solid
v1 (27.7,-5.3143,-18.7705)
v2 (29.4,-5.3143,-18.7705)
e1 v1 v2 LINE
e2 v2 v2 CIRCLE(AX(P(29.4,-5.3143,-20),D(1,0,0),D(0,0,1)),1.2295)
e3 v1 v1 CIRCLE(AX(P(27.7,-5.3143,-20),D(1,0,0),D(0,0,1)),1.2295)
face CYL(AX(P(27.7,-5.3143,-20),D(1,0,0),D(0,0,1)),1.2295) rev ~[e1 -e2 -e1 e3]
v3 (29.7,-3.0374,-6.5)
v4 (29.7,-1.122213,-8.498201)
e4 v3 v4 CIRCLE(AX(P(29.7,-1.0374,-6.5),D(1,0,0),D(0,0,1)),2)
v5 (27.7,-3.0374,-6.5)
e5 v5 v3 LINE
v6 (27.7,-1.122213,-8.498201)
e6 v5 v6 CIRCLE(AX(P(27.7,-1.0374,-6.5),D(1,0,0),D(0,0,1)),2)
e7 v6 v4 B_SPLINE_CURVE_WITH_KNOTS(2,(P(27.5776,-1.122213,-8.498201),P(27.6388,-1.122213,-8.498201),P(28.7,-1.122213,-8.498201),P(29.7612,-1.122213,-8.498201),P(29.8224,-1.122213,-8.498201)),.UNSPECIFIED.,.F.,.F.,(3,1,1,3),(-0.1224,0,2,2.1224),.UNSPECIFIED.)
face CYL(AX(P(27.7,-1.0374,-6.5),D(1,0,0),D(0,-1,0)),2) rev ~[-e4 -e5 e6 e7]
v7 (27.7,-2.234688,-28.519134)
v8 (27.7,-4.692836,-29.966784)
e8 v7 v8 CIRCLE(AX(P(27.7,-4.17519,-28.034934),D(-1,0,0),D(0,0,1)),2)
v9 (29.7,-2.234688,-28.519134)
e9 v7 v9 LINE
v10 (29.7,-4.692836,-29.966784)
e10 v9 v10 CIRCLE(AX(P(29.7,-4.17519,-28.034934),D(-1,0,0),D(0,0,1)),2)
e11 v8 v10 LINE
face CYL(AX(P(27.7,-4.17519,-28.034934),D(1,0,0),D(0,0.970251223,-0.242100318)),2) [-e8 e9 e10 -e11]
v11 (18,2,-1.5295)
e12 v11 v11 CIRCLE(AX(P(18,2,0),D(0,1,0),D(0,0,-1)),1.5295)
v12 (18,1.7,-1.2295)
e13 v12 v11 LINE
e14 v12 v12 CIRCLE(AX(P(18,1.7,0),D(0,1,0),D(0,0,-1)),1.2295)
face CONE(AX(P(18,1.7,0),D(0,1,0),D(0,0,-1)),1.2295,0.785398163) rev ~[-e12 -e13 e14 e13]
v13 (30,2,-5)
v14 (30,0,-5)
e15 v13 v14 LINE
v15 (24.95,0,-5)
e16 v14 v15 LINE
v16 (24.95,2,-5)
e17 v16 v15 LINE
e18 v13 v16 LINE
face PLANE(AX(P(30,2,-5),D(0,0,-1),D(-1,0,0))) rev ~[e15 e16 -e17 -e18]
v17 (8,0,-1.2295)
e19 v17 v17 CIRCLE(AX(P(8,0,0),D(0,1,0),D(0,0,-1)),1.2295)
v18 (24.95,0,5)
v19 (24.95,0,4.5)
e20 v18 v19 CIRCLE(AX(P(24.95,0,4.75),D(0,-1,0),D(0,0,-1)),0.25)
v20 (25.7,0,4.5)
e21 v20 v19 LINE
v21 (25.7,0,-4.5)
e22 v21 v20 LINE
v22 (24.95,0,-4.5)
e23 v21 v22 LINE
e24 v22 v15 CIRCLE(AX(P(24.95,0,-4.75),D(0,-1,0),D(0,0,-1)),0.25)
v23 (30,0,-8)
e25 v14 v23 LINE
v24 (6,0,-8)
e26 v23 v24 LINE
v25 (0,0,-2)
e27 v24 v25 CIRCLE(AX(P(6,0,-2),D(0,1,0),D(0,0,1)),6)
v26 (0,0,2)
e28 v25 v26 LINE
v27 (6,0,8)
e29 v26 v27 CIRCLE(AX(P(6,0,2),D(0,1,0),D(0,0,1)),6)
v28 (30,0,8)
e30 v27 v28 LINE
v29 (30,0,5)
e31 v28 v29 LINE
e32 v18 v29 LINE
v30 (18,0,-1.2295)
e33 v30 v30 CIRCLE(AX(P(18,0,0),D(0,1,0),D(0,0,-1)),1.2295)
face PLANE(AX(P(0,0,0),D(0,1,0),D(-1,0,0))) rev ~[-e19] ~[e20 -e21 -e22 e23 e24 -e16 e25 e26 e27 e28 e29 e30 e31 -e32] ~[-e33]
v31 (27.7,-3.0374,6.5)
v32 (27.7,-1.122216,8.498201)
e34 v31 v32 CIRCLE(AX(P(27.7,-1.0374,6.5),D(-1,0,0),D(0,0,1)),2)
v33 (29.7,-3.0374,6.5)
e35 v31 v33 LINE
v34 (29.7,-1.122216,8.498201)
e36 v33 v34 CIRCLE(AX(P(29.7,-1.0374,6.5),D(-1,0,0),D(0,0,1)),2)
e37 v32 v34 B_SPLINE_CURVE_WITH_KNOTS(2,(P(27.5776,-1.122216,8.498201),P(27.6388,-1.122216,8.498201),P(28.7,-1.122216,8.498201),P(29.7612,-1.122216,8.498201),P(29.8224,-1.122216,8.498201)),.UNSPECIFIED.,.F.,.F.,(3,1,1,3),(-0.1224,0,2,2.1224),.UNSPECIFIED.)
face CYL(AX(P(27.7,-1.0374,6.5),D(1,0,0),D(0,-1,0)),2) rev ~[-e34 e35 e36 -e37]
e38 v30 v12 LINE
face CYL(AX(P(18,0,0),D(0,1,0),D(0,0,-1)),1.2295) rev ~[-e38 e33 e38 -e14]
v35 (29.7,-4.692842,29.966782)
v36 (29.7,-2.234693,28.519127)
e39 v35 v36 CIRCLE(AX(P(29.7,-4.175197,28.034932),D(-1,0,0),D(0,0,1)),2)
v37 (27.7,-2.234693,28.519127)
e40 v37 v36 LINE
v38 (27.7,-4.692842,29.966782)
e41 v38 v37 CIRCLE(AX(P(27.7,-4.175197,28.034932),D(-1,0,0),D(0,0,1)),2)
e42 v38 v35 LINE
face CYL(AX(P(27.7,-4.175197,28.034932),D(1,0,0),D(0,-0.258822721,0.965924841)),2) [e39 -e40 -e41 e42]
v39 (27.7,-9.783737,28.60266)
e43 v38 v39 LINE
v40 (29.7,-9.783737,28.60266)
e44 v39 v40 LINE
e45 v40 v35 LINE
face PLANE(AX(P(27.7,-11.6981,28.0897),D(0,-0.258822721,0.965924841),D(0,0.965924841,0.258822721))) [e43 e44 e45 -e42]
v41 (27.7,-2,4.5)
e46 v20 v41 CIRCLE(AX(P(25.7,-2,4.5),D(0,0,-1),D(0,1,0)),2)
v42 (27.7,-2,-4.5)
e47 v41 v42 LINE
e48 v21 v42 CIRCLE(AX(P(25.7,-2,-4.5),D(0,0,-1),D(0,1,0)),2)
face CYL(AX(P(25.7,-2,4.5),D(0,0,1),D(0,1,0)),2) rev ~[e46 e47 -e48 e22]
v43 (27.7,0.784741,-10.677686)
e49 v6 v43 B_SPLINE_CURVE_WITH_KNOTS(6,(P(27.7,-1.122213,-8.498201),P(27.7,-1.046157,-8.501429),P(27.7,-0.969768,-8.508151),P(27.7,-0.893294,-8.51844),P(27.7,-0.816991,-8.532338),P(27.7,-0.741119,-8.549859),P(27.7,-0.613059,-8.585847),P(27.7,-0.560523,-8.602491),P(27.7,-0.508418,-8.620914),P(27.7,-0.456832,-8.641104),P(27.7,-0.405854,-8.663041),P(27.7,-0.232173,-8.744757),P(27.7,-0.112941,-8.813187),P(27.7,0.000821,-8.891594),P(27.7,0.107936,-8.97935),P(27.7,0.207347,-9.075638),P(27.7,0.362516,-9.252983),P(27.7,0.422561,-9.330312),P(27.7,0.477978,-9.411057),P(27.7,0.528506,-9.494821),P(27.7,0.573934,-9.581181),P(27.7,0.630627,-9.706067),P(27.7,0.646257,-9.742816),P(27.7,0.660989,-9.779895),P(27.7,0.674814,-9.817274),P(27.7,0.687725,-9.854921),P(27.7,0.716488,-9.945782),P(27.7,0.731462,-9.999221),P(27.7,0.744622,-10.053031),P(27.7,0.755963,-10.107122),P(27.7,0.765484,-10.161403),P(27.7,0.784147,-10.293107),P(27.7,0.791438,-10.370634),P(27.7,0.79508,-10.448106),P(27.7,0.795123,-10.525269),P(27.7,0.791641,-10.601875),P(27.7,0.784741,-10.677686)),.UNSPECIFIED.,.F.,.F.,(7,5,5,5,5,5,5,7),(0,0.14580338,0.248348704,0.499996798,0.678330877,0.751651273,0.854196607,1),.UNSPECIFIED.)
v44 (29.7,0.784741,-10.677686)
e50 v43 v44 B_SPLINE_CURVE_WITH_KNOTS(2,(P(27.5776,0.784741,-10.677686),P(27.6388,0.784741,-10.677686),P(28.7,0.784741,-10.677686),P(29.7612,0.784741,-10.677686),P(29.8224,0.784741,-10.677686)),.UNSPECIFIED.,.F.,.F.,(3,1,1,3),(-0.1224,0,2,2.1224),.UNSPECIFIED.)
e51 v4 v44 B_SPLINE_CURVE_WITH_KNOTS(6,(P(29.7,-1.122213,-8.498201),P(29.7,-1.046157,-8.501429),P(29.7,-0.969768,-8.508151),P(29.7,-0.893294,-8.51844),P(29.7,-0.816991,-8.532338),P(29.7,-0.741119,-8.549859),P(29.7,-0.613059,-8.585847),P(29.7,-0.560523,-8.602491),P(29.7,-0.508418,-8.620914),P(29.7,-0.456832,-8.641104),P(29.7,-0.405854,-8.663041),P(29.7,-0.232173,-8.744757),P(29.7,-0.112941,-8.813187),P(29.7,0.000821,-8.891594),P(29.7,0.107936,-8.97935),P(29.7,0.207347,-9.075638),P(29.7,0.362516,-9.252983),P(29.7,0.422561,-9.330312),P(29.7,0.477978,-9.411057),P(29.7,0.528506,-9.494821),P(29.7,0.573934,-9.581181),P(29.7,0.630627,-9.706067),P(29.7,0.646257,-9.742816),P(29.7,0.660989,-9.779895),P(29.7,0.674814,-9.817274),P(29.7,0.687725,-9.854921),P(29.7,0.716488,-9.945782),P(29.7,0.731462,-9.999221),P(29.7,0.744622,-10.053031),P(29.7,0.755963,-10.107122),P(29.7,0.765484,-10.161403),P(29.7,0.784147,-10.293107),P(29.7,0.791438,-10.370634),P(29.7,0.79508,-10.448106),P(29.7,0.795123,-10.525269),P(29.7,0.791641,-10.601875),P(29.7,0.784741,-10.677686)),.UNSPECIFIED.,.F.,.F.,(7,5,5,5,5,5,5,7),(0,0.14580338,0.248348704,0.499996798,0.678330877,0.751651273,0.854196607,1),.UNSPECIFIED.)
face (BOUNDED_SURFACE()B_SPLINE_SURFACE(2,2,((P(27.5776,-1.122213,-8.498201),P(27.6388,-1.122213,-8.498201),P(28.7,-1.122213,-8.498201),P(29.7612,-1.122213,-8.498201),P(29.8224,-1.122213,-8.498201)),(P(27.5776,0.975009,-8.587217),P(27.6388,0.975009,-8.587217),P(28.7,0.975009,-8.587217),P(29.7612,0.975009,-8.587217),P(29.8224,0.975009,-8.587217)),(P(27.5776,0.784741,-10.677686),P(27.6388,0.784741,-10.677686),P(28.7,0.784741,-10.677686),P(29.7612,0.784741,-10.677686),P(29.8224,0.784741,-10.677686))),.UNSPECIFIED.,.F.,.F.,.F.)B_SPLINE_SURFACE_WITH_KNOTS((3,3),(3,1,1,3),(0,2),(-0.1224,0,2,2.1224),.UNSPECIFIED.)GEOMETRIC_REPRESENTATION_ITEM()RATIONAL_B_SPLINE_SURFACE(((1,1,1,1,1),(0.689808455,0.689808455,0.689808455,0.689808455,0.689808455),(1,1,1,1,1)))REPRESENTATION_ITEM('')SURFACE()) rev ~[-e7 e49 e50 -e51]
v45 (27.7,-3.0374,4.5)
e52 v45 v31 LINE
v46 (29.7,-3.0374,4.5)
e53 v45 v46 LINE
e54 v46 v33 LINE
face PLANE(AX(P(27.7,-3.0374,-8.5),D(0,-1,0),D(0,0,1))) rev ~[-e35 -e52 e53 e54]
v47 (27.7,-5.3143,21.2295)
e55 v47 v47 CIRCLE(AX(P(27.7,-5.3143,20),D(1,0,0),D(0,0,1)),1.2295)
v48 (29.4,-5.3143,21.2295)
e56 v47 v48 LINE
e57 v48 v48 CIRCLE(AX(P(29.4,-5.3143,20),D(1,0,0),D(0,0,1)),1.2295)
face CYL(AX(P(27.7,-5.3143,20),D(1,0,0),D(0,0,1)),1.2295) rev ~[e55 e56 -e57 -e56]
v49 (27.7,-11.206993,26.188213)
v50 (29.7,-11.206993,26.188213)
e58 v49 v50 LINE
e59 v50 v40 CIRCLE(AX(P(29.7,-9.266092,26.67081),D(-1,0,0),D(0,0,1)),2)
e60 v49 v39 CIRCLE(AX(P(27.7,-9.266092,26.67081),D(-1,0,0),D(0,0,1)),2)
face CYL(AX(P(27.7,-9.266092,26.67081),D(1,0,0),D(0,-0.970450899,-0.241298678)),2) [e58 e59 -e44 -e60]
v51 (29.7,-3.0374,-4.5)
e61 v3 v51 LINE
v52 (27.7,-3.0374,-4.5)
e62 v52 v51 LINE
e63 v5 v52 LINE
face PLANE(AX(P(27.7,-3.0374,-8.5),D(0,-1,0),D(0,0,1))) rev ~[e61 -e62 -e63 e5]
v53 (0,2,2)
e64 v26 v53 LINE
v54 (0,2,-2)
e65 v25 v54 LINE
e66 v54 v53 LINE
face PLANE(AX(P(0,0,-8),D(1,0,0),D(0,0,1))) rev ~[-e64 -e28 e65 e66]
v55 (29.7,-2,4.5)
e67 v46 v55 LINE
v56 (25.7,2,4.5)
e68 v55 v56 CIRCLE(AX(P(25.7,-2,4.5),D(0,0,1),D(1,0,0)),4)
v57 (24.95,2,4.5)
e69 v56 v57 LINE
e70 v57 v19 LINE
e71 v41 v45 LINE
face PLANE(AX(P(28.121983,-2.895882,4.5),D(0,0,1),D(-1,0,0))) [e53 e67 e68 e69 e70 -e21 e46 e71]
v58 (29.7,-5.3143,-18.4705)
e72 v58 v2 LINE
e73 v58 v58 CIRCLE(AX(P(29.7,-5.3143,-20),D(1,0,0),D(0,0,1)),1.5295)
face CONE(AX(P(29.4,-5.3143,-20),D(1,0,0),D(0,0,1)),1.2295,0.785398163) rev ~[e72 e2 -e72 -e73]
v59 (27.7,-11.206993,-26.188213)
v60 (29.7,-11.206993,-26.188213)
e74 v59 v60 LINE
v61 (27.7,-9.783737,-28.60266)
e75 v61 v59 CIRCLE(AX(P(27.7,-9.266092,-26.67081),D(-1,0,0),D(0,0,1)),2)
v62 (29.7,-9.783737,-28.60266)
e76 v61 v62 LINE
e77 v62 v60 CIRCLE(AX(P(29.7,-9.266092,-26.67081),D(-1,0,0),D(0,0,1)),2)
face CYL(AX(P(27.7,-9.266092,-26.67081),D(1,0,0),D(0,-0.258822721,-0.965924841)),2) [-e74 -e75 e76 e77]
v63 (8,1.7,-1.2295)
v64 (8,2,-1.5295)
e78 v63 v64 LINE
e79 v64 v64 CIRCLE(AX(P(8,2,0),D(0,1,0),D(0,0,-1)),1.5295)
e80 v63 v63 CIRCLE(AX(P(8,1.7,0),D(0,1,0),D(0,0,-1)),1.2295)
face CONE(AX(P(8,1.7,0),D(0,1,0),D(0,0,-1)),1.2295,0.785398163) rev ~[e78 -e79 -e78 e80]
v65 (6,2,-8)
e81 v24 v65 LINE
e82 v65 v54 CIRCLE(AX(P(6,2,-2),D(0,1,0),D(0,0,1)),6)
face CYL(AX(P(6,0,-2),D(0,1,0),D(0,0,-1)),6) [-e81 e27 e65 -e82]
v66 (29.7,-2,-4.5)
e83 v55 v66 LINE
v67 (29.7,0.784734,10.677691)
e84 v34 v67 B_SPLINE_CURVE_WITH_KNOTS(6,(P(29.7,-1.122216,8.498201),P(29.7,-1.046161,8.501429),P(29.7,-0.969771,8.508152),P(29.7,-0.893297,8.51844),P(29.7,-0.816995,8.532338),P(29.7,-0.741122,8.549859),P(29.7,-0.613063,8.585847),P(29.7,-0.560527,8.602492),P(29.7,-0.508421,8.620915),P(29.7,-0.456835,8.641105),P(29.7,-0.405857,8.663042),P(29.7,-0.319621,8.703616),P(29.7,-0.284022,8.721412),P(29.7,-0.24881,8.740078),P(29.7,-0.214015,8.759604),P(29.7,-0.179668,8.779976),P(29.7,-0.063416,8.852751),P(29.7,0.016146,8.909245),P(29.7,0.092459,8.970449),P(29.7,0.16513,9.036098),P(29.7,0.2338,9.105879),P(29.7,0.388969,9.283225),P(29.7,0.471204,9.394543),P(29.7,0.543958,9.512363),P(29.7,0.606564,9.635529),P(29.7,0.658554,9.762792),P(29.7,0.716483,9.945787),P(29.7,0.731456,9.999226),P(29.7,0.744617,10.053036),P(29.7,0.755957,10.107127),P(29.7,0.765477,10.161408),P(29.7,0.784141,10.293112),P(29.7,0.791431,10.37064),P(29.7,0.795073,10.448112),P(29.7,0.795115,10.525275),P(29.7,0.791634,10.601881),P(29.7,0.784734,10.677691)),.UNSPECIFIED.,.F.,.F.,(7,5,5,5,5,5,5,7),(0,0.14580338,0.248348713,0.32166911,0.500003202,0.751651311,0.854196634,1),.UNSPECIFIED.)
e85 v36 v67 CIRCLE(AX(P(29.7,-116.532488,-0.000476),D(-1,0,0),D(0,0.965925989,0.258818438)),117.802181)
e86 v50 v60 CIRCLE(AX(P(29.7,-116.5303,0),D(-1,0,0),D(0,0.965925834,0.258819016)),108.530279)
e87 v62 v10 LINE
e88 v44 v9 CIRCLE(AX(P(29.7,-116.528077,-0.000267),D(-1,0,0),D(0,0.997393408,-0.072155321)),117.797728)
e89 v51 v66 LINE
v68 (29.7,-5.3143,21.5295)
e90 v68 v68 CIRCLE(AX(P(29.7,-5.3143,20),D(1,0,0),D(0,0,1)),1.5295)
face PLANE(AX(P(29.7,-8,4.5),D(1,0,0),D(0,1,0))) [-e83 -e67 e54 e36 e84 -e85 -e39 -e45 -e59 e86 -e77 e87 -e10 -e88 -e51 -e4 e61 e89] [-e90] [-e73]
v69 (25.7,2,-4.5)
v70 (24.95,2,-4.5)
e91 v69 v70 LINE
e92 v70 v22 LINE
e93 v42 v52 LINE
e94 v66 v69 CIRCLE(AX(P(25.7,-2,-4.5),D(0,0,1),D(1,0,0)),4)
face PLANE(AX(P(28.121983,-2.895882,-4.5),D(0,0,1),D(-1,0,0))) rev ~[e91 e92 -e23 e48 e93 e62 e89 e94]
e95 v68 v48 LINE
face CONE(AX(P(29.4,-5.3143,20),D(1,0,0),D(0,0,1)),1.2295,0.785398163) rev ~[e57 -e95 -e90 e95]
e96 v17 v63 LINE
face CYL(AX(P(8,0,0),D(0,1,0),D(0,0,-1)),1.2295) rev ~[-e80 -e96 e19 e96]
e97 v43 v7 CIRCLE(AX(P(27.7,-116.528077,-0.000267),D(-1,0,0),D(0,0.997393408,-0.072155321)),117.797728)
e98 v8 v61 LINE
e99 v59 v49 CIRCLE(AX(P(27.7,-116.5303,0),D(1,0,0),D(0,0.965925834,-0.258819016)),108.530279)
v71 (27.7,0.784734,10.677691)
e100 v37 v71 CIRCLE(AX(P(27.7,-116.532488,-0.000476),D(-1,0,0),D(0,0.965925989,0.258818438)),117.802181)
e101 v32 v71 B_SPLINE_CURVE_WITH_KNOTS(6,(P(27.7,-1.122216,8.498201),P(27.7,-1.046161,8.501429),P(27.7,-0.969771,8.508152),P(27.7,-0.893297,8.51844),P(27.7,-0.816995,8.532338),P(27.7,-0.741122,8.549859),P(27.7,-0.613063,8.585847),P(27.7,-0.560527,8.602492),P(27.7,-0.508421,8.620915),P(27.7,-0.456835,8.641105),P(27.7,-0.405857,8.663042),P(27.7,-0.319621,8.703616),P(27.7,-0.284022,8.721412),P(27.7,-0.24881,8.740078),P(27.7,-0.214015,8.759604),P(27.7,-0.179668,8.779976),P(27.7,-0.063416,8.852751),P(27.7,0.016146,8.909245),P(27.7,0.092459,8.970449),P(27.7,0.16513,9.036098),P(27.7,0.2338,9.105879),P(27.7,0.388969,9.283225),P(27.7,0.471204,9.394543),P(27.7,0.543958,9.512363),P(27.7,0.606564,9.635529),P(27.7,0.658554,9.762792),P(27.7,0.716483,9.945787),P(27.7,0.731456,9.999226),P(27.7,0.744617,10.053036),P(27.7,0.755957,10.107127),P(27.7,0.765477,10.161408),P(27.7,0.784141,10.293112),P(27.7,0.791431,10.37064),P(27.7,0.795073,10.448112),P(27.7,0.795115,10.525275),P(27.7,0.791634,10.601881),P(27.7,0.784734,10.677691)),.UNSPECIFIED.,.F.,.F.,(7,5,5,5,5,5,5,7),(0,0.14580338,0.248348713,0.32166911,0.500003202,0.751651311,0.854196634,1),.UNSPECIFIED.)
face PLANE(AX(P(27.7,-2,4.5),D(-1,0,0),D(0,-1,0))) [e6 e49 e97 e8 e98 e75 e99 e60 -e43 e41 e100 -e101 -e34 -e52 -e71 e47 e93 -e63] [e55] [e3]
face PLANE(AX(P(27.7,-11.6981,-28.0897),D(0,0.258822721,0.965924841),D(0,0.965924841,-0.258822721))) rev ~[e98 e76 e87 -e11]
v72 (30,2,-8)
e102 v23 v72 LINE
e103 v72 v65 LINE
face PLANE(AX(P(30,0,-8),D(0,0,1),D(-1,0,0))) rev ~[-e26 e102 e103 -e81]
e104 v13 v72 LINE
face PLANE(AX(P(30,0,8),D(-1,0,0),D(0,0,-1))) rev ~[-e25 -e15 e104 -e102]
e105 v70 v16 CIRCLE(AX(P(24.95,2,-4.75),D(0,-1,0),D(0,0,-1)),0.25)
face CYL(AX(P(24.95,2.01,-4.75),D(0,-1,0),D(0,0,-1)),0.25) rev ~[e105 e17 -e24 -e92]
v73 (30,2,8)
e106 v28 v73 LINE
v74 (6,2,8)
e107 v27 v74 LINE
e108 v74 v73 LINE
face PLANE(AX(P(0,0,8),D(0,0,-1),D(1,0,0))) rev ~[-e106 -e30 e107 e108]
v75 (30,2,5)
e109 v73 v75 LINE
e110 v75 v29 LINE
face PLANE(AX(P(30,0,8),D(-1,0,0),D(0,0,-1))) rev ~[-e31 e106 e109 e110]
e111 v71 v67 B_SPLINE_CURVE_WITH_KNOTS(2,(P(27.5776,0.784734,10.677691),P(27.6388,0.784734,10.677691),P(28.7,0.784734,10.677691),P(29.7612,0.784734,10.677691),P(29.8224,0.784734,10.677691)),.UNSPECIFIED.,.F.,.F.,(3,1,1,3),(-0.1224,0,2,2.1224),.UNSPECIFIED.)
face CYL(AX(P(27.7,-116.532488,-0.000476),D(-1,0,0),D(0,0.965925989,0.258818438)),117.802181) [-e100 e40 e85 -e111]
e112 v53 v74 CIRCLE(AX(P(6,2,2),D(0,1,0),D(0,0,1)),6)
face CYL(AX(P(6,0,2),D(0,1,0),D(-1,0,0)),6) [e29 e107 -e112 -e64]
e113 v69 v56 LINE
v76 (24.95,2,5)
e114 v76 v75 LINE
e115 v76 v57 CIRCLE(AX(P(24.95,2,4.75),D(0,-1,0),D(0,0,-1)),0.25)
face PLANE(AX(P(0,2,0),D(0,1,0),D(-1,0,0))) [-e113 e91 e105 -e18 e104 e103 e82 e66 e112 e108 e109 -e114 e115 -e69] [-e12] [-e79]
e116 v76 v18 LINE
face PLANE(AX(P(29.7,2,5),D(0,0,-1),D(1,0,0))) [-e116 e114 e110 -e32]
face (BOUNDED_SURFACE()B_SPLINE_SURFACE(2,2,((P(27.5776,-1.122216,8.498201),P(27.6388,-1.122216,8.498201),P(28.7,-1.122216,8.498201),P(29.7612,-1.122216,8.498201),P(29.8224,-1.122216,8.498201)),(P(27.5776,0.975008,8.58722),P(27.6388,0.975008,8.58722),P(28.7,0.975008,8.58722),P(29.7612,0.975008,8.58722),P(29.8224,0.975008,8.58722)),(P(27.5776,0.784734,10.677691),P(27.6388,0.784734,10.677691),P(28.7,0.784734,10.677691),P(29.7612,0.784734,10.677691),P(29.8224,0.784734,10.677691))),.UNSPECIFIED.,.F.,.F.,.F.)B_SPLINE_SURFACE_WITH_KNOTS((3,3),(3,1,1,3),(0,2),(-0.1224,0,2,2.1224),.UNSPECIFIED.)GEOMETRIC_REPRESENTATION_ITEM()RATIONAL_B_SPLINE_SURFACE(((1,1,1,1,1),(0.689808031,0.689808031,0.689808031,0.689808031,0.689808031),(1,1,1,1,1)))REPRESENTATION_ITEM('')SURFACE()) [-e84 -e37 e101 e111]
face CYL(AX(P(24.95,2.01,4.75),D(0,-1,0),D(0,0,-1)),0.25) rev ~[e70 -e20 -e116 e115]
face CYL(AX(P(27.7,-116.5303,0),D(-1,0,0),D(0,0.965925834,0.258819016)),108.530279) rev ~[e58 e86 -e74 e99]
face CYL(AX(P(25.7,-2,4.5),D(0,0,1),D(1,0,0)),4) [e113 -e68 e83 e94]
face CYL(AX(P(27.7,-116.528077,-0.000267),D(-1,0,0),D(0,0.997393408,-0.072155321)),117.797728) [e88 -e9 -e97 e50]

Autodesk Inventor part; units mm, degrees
ref_plane "YZ Plane" through (0, 0, 0) normal (1, 0, 0) x (0, 1, 0)
ref_plane "XZ Plane" through (0, 0, 0) normal (0, 1, 0) x (-1, 0, 0)
ref_plane "XY Plane" through (0, 0, 0) normal (0, 0, 1) x (1, 0, 0)
sketch "Szkic1" plane through (0, 0, 0) normal (0, 1, 0) x (-1, 0, 0)
  line L0 (0, 8) -> (-30, 8)
  line L1 (-30, 8) -> (-30, -8)
  line L2 (-30, -8) -> (0, -8)
  line L3 (0, -8) -> (0, 8)
  point P0 (0, 0)
  dimension "d0" = 30
  dimension "d1" = 16
  dimension "d18" = 8
extrude "Płyta1" add sketch "Szkic1" along normal blind 2
sketch "Szkic2" plane through (0, 2, 0) normal (0, 1, 0) x (1, 0, 0)
  line L0 (30, -8) -> (30, 8) projected
  line L1 (30, 5) -> (29.7, 5)
  line L2 (29.7, 5) -> (29.7, -5)
  line L3 (29.7, -5) -> (30, -5)
  line L4 (30, -5) -> (30, 5)
  line L5 (0, 8) -> (30, 8) projected
  point P0 (0, 0)
  dimension "d3" = 10
  dimension "d4" = 3
  dimension "d5" = 0.3
extrude "Wyciągnięcie proste1" cut sketch "Szkic2" against normal up to next
sketch "Szkic3" plane through (27.7, 2, -5) normal (1, 0, 0) x (0, -1, 0)
  line L0 (0, 9.5) -> (0, 0.5)
  line L1 (0, 0.5) -> (10, 0.5)
  line L2 (10, 0.5) -> (10, 9.5)
  line L3 (10, 9.5) -> (0, 9.5)
edge flange "Kołnierz1" height 10 angle 90 thickness 2 bend radius 2 thickness toward (1, 0, 0) relief round relief width 0.5 relief depth 1 edges at (29.7, 2, 0) wall of the first edge with corners at (27.7, 2, 4.5) (27.7, 2, -4.5) (27.7, -8, -4.5) (27.7, -8, 4.5)
bend "Zagięcie1"
corner "Narożnik1"
sketch "Szkic5" plane through (27.7, -8, -4.5) normal (-1, 0, 0) x (0, 0, 1)
  line L0 (9, 0) -> (0, 0)
  arc A0 (32.5897, -3.6981) -> (-23.5897, -3.6981) centre (4.5, -108.5303) ccw
  line L1 (9.5, 10) -> (12.5, 10)
  line L2 (32.5897, -3.6981) -> (34.9889, 5.2557)
  line L3 (-23.5897, -3.6981) -> (-25.9889, 5.2557)
  line L4 (0, 6) -> (9, 6)
  arc A1 (34.9889, 5.2557) -> (13, 8.9626) centre (4.5, -108.5303) ccw
  arc A2 (-4, 8.9626) -> (-25.9889, 5.2557) centre (4.5, -108.5303) ccw
  line L5 (-4, 8.9626) -> (-4, 4.9626)
  line L6 (-4, 4.9626) -> (13, 4.9626)
  line L7 (13, 4.9626) -> (13, 8.9626)
  circle A3 centre (4.5, -108.5303) radius 113
  line L8 (4.5, 0) -> (4.5, -108.5303)
  point P0 (4.5, 8)
  dimension "d38" = 4
  dimension "d39" = 17
  dimension "d42" = 226
  dimension "d69" = 108.5303
sheet face with bend "Powierzchnia2" sketch "Szkic5" thickness 2 toward (1, 0, 0) bend radius 2 picked at (25.4474, 0.8245) contours A0 L3 A3 L2 | A3 L3 A2 L5 L6 L7 A1 L2
bend "Zagięcie2"
fillet "Zaokrąglenie narożnika1" radius 2 8 edges at (28.7, 0.9626, -8.5) (28.7, -11.6981, -28.0897) (28.7, -11.6981, 28.0897) (28.7, -3.0374, -8.5) (28.7, -2.7443, 30.4889) (28.7, 0.9626, 8.5) (28.7, -3.0374, 8.5) (28.7, -2.7443, -30.4889)
fillet "Zaokrąglenie narożnika2" radius 6 2 edges at (0, 1, 8) (0, 1, -8)
sketch "Szkic6" plane through (27.7, -2, -4.5) normal (-1, 0, 0) x (0, 0, 1)
  point P0 (4.5, 2)
sketch "Szkic7" plane through (27.7, -2, -4.5) normal (-1, 0, 0) x (0, 0, 1)
  line L0 (9, 0) -> (0, 0) projected
  line L1 (4.5, 0) -> (4.5, -9.6943)
  arc A0 (30.6882, -9.207) -> (-21.6882, -9.207) centre (4.5, -114.5303) ccw projected
  line L2 (4.5, -6) -> (4.5, -114.5303)
  circle A1 centre (4.5, -114.5303) radius 113
  point P0 (4.5, 2)
  point P1 (24.5, -3.3143)
  point P2 (-15.5, -3.3143)
  dimension "d49" = 20
  dimension "d50" = 20
  dimension "d70" = 108.5303
  dimension "d71" = 226
hole "Otwór1" at (27.7, -5.3143, -20) at (27.7, -5.3143, 20) direction (1, 0, 0) diameter 2.459 end through all thread size "M3x0.5" class "6H" standard "ANSI Metric M Profile"
sketch "Szkic8" plane through (0, 0, 0) normal (0, -1, 0) x (1, 0, 0)
  line L0 (30, 5) -> (30, 8) projected
  point P0 (0, 0)
  point P1 (8, 0)
  point P2 (18, 0)
  dimension "d60" = 8
  dimension "d61" = 10
  dimension "d75" = 12
hole "Otwór2" at (8, 0, 0) at (18, 0, 0) direction (0, 1, 0) diameter 2.459 end through all thread size "M3x0.5" class "6H" standard "ANSI Metric M Profile"
chamfer "Faza1" distance 0.3 angle 45 4 edges at (29.7, -5.3143, -21.2295) (29.7, -5.3143, 18.7705) (8, 2, 1.2295) (18, 2, 1.2295)
equation "\"d2\" = Grubość"
equation "\"d9\" = GłębokośćGięciaPodcięcia"
equation "\"d10\" = MinimalnaPozostałość"
equation "\"d11\" = PromieńPrzejścia"
equation "\"d14\" = PromieńGięcia"
equation "\"d15\" = RozmiarPodcięciaNarożnika"
equation "\"d16\" = Wielk_odstępu"
equation "\"d17\" = Rozmiar_promienia_Jacobiego"
equation "\"d31\" = PromieńGięcia"
equation "\"d32\" = SzerokośćGięciaPodcięcia"
equation "\"d34\" = MinimalnaPozostałość"
equation "\"d33\" = GłębokośćGięciaPodcięcia"
equation "\"d35\" = PromieńPrzejścia"
equation "\"PromieńGięcia\" = Grubość"
equation "\"SzerokośćGięciaPodcięcia\" = Grubość"
equation "\"GłębokośćGięciaPodcięcia\" = 0.5 * Grubość"
equation "\"RozmiarPodcięciaNarożnika\" = 4 * Grubość"
equation "\"MinimalnaPozostałość\" = 2 * Grubość"
equation "\"PromieńPrzejścia\" = PromieńGięcia"
equation "\"Rozmiar_promienia_Jacobiego\" = PromieńGięcia"
equation "\"Wielk_odstępu\" = Grubość"
equation "\"Grubość\" = 2"
properties part number "NowyKatownik" material "Stal nierdzewna"
